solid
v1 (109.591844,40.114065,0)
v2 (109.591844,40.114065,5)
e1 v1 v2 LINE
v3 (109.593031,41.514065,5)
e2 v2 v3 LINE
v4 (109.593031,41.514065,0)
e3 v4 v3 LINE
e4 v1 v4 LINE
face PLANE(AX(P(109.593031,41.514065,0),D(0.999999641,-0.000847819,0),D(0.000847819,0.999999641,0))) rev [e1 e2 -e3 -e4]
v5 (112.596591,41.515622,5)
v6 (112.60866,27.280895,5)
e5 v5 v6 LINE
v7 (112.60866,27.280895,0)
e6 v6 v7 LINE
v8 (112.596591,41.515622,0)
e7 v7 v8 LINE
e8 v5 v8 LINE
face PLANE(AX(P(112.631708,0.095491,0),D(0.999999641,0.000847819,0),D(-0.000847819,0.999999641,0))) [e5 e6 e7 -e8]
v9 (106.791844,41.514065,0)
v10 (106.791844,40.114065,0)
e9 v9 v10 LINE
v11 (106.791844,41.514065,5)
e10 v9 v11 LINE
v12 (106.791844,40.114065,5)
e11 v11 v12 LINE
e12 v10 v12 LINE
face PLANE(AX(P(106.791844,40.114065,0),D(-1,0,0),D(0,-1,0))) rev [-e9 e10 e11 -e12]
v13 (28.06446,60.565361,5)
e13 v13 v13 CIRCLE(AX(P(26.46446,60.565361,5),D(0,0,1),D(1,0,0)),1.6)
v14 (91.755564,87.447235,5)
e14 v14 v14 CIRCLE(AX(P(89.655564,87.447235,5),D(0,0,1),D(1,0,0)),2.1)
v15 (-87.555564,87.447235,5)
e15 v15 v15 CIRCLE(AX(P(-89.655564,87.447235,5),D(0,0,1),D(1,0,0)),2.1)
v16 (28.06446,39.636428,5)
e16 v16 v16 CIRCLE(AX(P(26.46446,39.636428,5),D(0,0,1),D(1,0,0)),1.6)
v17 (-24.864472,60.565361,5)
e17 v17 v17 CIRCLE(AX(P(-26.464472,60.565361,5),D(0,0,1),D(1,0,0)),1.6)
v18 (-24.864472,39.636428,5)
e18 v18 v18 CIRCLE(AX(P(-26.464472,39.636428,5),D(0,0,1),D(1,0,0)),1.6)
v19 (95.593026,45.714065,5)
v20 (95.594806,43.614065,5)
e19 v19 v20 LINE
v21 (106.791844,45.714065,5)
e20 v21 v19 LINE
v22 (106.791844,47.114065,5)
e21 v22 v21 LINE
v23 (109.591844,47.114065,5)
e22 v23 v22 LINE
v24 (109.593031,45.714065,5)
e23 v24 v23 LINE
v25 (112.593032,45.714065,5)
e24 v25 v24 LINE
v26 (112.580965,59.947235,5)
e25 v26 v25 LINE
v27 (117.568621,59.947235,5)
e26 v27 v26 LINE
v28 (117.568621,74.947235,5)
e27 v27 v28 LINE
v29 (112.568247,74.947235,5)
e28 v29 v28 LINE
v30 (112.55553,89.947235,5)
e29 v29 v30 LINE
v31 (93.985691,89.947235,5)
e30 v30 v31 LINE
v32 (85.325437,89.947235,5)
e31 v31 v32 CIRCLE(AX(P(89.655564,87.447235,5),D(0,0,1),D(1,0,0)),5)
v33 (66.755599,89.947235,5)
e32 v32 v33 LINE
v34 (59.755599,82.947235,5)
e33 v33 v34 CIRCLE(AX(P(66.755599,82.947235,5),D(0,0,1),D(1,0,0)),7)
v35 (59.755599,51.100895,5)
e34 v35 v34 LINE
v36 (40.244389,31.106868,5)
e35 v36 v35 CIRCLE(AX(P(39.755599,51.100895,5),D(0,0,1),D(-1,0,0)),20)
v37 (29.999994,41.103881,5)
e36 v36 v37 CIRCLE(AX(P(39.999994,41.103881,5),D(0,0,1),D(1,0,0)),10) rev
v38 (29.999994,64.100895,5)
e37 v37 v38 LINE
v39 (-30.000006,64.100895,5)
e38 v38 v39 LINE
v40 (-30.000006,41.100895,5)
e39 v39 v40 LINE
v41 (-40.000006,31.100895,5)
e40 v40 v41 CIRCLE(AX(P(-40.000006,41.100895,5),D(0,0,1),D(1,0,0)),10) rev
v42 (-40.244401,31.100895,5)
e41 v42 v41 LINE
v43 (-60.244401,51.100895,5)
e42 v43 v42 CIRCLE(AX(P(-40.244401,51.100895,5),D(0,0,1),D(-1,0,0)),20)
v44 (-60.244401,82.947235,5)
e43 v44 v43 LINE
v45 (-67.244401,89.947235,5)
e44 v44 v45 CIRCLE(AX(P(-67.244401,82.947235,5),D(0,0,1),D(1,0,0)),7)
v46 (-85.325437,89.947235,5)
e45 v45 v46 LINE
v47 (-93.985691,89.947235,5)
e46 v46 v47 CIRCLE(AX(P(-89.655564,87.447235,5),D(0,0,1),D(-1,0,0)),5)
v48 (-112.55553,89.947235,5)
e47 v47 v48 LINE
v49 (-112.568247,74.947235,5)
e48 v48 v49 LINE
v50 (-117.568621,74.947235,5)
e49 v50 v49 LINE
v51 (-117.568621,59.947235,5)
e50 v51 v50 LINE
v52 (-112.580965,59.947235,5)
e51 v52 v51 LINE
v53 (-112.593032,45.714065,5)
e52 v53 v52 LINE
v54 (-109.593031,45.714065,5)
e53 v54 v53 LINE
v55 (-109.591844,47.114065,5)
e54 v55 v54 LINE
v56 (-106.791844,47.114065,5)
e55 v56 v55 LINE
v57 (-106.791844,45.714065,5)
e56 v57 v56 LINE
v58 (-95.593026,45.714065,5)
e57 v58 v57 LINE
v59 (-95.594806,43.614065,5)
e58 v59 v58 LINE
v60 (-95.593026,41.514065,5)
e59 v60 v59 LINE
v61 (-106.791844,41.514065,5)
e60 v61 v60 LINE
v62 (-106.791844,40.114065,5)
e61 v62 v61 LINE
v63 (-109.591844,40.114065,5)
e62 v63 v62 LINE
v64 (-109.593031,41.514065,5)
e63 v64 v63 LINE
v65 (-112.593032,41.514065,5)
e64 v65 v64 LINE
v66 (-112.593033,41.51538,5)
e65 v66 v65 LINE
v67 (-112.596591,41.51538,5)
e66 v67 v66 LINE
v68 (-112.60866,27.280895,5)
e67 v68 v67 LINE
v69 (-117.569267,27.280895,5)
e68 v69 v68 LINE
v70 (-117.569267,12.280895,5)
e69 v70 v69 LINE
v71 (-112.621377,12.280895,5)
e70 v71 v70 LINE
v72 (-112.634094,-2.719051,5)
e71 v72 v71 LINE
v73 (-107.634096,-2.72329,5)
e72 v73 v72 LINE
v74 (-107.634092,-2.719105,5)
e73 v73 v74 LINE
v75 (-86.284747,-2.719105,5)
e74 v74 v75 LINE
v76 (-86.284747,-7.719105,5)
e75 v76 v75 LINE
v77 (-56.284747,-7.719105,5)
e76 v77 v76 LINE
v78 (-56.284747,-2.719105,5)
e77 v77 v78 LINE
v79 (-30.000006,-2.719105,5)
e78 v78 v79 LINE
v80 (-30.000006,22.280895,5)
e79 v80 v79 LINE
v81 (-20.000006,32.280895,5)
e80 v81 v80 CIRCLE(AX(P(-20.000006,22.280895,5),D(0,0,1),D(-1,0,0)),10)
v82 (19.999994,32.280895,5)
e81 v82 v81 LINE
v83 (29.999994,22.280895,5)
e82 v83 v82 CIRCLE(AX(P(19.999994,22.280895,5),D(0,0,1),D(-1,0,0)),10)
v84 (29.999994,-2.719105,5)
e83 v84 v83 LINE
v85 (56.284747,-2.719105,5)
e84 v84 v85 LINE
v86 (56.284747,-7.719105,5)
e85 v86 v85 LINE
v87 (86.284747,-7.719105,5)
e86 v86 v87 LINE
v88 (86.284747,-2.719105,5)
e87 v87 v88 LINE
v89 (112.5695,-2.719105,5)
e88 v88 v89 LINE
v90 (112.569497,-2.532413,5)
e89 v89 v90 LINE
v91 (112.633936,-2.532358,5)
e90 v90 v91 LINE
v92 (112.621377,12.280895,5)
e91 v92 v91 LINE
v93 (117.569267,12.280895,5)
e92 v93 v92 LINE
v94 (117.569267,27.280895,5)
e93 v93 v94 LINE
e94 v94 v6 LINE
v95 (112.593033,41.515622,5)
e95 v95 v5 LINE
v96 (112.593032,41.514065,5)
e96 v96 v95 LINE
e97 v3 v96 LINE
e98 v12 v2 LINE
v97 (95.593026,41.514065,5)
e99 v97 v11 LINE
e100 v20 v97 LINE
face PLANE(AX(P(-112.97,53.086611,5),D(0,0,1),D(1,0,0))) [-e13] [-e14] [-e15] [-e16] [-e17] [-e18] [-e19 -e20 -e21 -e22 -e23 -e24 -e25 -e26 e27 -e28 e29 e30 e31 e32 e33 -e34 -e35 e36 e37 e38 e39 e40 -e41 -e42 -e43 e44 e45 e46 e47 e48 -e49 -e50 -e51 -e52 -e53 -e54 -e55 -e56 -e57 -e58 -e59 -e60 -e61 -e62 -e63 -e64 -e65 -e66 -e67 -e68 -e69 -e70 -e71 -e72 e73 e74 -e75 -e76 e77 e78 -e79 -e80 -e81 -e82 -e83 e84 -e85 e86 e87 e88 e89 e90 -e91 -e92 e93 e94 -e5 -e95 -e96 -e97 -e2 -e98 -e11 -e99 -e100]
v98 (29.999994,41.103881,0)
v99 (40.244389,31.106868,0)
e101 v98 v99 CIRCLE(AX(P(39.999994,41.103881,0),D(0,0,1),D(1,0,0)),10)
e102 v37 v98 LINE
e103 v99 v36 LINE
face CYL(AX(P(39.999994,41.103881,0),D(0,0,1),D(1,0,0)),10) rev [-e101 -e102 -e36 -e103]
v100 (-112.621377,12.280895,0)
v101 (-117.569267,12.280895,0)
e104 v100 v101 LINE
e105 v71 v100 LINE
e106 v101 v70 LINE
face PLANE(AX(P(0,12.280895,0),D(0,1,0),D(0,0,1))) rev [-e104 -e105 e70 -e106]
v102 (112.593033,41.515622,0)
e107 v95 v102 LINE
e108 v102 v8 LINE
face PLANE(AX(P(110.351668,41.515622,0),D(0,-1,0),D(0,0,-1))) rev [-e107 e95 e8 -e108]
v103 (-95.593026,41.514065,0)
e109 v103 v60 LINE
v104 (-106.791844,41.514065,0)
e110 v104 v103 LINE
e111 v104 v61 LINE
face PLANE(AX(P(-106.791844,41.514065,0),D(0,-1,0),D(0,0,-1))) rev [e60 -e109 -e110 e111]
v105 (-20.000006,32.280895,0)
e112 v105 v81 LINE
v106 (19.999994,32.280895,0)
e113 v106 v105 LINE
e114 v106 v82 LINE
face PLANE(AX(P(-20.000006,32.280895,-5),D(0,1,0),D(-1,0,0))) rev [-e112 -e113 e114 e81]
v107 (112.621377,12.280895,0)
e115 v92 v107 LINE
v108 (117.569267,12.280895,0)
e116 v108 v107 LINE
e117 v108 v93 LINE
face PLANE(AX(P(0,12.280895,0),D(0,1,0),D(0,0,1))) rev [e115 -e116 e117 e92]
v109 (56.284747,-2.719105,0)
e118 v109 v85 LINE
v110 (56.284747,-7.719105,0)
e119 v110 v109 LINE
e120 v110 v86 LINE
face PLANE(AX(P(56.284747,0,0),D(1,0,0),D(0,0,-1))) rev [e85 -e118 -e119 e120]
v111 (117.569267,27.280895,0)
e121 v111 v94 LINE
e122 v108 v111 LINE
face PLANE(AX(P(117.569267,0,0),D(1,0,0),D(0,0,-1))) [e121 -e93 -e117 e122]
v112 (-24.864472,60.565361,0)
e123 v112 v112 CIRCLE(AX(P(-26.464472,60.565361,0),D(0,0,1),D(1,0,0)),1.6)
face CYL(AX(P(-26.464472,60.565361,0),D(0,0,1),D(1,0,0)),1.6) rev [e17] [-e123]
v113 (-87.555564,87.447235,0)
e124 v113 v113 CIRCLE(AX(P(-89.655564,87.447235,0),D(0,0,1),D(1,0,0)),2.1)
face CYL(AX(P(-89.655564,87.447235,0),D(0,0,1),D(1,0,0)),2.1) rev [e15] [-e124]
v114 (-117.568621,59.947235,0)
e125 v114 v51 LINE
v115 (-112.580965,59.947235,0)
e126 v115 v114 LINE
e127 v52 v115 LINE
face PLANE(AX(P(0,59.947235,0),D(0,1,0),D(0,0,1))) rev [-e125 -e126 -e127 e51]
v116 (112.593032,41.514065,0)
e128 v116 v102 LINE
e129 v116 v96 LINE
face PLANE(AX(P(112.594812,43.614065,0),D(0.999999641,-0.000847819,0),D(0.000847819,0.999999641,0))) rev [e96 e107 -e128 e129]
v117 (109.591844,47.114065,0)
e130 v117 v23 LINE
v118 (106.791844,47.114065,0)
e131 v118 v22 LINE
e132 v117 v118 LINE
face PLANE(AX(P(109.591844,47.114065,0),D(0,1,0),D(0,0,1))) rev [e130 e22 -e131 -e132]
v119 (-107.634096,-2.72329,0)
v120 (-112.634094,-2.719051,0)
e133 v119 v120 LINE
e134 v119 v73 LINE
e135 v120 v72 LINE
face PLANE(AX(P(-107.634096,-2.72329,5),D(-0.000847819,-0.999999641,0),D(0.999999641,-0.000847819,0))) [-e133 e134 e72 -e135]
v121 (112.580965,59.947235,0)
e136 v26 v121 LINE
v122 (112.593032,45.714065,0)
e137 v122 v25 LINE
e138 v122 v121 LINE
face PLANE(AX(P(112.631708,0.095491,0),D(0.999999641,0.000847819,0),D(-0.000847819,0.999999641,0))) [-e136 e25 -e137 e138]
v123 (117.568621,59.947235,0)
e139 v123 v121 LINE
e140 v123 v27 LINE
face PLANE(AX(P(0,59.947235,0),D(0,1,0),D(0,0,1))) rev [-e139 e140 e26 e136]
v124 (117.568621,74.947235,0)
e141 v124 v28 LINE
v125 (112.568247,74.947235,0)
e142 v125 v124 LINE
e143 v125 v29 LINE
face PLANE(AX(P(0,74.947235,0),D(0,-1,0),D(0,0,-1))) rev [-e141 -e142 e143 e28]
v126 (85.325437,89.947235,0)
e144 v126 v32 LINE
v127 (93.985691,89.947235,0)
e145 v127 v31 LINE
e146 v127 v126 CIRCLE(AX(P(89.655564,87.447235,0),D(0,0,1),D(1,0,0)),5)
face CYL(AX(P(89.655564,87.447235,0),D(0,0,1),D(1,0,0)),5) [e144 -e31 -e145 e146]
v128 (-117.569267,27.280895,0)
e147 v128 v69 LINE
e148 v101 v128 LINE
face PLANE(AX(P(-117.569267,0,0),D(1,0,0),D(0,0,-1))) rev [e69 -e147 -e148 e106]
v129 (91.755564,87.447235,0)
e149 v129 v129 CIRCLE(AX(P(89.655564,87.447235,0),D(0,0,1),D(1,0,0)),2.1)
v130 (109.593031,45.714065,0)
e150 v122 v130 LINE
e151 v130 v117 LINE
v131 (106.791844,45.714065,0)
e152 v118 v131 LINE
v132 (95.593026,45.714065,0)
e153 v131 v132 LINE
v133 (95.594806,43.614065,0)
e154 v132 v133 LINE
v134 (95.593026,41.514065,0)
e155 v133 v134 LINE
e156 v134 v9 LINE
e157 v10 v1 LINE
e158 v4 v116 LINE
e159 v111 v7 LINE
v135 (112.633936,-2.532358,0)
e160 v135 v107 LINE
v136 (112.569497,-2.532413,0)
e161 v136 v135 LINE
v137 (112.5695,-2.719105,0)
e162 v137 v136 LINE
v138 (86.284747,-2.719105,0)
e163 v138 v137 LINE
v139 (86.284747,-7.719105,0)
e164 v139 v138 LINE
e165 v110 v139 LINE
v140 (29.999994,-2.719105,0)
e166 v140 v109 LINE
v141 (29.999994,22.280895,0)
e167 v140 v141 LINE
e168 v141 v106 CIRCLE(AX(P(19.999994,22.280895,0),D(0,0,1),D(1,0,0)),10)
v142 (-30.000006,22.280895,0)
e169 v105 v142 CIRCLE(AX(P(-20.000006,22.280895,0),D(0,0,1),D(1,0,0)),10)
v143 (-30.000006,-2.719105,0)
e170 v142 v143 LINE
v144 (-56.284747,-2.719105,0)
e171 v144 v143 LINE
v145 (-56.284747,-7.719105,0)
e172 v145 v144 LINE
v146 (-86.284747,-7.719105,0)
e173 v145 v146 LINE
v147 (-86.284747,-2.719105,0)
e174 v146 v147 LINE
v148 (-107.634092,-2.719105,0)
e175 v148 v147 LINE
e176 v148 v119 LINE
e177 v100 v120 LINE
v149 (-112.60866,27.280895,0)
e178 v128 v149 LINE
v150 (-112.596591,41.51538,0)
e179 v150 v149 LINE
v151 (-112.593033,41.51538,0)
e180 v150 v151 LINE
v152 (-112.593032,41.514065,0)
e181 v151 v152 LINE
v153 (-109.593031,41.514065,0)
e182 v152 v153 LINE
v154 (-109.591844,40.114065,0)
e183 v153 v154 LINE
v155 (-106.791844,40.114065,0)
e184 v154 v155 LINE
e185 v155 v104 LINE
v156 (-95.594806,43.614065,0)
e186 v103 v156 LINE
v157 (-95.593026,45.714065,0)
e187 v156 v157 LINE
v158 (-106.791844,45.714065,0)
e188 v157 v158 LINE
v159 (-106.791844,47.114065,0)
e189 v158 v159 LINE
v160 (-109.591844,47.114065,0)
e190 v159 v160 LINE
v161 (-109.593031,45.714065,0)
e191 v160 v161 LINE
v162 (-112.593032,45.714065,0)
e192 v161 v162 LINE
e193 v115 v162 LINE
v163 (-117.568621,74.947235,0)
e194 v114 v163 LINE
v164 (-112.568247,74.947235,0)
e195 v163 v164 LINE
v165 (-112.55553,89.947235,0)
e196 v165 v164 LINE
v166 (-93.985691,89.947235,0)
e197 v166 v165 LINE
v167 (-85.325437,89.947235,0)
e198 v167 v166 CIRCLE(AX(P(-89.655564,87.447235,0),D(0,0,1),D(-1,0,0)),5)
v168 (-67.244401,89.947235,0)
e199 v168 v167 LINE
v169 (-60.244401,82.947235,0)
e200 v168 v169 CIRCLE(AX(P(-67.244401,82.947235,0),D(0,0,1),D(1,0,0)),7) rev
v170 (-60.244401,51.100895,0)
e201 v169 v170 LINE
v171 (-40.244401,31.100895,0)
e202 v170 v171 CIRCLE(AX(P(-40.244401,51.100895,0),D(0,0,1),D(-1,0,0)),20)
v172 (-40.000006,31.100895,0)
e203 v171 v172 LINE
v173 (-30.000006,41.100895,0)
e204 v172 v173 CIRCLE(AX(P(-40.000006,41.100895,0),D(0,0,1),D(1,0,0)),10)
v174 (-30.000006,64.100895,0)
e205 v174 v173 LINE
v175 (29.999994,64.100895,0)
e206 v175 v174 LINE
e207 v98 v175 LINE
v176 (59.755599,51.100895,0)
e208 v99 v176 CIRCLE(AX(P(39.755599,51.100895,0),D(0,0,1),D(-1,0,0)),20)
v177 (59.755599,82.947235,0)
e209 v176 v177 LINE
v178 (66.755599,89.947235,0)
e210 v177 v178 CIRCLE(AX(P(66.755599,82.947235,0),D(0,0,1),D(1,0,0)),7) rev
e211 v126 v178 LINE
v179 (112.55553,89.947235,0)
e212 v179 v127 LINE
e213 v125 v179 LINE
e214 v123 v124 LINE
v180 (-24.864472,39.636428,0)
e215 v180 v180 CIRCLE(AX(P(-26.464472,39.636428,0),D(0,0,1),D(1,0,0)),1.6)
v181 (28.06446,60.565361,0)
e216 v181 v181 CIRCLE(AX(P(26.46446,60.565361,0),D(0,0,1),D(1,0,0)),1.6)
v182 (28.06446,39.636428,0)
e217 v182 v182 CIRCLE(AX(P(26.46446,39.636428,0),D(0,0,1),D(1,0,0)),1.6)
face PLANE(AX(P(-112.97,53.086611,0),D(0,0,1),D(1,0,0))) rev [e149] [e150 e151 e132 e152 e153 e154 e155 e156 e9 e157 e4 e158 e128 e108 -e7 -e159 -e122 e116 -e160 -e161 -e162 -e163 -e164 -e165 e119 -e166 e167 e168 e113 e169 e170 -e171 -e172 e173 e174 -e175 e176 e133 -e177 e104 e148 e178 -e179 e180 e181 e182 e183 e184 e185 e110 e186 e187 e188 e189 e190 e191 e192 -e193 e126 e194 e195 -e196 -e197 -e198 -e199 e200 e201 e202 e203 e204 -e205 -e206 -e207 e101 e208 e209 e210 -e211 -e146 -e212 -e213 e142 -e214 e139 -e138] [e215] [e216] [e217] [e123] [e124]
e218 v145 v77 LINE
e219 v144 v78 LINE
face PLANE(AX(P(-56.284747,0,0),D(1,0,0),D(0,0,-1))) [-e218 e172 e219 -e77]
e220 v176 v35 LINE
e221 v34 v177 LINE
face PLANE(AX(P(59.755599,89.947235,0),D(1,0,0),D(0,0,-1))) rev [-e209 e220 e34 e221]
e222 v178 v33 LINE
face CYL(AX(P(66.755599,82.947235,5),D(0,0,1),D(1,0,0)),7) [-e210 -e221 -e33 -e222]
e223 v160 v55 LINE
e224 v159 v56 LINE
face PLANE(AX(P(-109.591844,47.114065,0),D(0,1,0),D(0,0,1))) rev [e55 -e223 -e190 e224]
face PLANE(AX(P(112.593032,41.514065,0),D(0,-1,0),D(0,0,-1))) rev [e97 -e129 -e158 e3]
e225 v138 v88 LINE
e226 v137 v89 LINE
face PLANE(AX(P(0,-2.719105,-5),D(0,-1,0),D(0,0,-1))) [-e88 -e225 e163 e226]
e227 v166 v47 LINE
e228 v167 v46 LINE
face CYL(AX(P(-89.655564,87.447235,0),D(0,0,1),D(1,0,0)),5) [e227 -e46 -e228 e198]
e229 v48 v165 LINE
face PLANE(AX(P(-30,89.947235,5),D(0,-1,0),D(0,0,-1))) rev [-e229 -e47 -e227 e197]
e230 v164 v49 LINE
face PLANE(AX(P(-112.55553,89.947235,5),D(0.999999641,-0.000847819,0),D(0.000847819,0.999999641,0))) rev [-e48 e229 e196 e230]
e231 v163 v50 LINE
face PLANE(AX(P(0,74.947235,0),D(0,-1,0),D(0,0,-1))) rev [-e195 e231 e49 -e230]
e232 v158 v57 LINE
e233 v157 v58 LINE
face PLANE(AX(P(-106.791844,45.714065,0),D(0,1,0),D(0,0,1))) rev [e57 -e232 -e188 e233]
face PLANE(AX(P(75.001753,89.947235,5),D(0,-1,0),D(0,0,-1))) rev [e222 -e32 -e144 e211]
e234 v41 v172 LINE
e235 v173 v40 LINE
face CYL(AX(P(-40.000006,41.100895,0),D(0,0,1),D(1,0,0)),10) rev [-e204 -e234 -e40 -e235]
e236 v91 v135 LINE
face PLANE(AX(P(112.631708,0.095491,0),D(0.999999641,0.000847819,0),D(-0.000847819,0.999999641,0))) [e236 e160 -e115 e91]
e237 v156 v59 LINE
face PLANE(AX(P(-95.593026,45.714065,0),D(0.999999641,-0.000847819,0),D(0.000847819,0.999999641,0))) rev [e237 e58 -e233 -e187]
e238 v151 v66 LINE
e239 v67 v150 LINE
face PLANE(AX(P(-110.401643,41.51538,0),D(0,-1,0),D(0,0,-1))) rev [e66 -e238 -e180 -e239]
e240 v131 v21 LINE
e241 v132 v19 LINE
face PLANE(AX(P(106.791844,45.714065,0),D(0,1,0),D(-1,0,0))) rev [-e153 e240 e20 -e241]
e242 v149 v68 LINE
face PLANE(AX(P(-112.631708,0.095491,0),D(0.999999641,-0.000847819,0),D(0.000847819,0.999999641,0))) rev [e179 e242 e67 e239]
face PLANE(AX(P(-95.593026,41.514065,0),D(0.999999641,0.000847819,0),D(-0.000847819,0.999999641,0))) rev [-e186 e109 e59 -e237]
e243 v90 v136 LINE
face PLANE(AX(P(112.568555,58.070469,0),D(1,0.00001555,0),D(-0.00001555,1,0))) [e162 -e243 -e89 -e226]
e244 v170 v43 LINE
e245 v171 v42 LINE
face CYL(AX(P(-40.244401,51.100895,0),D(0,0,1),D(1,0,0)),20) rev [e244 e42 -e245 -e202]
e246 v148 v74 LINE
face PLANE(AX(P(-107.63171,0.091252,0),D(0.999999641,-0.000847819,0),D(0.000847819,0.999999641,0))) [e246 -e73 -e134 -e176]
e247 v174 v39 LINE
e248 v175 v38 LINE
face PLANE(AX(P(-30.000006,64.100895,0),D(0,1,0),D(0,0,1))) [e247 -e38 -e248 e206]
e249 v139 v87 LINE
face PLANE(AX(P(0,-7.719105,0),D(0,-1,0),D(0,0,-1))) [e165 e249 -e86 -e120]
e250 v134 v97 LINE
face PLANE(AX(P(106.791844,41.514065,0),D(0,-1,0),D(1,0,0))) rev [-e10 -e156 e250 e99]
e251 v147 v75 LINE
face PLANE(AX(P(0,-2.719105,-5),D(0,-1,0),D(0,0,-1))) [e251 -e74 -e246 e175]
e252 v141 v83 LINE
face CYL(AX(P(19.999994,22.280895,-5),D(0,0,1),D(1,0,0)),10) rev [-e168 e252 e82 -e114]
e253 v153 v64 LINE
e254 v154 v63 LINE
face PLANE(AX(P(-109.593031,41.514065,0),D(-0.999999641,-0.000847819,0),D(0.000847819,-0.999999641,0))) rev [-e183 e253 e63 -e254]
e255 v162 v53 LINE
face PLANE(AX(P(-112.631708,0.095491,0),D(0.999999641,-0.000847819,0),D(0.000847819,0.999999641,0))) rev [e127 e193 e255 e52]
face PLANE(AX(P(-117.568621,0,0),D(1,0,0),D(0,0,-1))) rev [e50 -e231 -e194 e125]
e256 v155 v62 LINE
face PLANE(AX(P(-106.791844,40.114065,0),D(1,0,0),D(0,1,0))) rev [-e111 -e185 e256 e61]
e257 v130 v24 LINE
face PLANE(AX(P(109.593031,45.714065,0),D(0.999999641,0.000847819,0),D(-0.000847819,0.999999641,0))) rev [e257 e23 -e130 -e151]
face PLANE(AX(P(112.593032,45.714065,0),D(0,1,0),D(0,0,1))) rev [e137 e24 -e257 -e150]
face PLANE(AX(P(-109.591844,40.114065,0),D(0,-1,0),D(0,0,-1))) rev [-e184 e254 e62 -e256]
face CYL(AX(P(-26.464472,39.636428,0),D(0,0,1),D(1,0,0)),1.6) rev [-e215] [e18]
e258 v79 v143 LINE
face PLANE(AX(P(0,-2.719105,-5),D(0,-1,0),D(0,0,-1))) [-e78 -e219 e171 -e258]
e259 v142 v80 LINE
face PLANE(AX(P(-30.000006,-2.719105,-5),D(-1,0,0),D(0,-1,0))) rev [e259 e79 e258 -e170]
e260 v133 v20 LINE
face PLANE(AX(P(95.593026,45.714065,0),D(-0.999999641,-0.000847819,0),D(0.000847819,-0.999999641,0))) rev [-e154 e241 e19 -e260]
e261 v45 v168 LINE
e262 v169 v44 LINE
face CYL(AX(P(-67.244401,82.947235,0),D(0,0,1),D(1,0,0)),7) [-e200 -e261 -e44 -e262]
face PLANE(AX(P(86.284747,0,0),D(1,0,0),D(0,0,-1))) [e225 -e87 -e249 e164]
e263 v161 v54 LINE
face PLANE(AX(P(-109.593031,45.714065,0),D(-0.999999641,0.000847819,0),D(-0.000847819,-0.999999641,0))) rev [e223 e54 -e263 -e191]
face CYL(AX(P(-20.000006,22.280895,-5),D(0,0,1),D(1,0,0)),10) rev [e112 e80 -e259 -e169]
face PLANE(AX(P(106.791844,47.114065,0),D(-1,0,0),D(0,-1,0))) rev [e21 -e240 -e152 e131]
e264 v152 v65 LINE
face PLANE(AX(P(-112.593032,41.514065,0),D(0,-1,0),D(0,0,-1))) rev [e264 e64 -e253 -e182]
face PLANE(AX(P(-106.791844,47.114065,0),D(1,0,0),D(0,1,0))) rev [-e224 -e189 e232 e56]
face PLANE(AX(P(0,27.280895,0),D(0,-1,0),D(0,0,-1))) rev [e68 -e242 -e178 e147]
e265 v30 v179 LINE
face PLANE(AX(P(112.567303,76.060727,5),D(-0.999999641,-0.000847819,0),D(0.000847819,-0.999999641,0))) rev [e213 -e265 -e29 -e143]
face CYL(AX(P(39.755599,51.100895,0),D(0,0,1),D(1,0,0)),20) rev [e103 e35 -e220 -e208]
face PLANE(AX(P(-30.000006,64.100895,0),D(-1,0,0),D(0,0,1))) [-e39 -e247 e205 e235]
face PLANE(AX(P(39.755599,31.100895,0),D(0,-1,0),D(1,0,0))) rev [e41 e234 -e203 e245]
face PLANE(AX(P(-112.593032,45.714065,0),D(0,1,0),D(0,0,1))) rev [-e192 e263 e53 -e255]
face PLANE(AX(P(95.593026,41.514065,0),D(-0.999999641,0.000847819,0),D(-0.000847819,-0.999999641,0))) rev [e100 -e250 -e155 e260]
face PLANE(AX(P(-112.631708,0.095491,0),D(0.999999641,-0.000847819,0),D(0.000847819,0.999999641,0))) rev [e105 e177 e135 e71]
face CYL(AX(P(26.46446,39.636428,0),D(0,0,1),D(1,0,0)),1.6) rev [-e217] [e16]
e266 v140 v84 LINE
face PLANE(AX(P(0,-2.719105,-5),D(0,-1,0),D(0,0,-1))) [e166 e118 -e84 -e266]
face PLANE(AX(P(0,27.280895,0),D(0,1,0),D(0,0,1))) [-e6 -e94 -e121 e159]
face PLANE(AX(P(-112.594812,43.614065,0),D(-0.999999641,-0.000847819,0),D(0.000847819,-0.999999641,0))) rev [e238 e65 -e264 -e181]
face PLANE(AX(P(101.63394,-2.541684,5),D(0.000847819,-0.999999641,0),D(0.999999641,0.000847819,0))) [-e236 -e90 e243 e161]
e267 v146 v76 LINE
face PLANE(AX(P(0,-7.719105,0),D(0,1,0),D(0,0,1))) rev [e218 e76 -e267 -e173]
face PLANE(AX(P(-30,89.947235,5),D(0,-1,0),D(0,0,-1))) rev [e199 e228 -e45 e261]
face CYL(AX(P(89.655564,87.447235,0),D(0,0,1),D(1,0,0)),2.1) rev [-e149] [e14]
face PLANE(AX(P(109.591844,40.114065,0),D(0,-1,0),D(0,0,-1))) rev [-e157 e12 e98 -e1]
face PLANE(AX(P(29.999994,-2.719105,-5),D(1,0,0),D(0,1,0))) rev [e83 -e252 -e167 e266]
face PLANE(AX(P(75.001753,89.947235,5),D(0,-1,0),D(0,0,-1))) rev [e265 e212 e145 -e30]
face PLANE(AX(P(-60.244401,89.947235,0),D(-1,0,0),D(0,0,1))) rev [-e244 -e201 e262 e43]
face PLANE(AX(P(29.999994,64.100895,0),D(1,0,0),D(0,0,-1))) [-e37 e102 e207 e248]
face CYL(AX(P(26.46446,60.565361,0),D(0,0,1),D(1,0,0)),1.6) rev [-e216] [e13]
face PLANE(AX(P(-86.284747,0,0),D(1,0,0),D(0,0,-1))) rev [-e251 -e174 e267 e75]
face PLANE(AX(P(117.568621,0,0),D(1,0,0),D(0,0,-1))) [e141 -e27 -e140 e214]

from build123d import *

# Parameters (mm, degrees)
BOSS_EXTRUDE1_DEPTH     = 5
BOSS_EXTRUDE2_START     = -5
BOSS_EXTRUDE2_DEPTH     = 5
CUT_EXTRUDE1_DEPTH      = 5
FILLET1_R               = 7
SKETCH5_W               = 60
SKETCH5_H               = 33
BOSS_EXTRUDE3_DEPTH     = 5
SKETCH6_R               = 1.6
CUT_EXTRUDE2_DEPTH      = 5
CUT_EXTRUDE3_START      = -5
CUT_EXTRUDE3_DEPTH      = 5
CUT_EXTRUDE4_DEPTH      = 10
FILLET2_R               = 10
BOSS_EXTRUDE5_START     = -5
BOSS_EXTRUDE5_OUTLINE_W = 30
BOSS_EXTRUDE5_OUTLINE_H = 5
BOSS_EXTRUDE5_DEPTH     = 5
SKETCH12_W              = 5
SKETCH12_H              = 92.666318873
BOSS_EXTRUDE6_DEPTH     = 5
SKETCH13_W              = 5
SKETCH13_H              = 92.479626066
BOSS_EXTRUDE7_DEPTH     = 11
SKETCH14_W              = 14.125243299
SKETCH14_H              = 18.417399827
SKETCH14_W_2            = 17.448829958
BOSS_EXTRUDE8_DEPTH     = 5
CUT_EXTRUDE5_DEPTH      = 5
SKETCH17_W              = 6.263528668
SKETCH17_H              = 4.2
SKETCH17_W_2            = 6.634448871
CUT_EXTRUDE6_DEPTH      = 5
BOSS_EXTRUDE9_DEPTH     = 5
CUT_EXTRUDE7_DEPTH      = 5
SKETCH21_W              = 3.746111535
SKETCH21_H              = 4.198684894
SKETCH21_W_2            = 4.081394213
SKETCH21_H_2            = 4.198442995
CUT_EXTRUDE8_DEPTH      = 5
BOSS_EXTRUDE10_DEPTH    = 5
SKETCH23_R              = 2.1
CUT_EXTRUDE9_DEPTH      = 5


# Read off the part's stored shape, not the designer's step: Cut-Extrude3, Boss-Extrude5
with BuildPart() as part:
    # Sketch1 → Boss-Extrude1 (new body)
    with BuildSketch(Plane.XY):
        with BuildLine():
            Line((-112.555529977, 89.947234922), (-112.567255319, 76.117234919))
            Line((-112.567255319, 76.117234919), (-109.550918722, 76.117234919))
            Line((-109.550918722, 76.117234919), (-109.550918722, 77.517234919))
            Line((-109.550918722, 77.517234919), (-106.750918722, 77.517234919))
            Line((-106.750918722, 77.517234919), (-106.750918722, 76.117234919))
            Line((-106.750918722, 76.117234919), (-95.550918722, 76.117234919))
            Line((-95.550918722, 76.117234919), (-95.550918722, 71.917234919))
            Line((-95.550918722, 71.917234919), (-106.750918722, 71.917234919))
            Line((-106.750918722, 71.917234919), (-106.750918722, 70.517234919))
            Line((-106.750918722, 70.517234919), (-109.550918722, 70.517234919))
            Line((-109.550918722, 70.517234919), (-109.550918722, 71.917234919))
            Line((-109.550918722, 71.917234919), (-112.5683672, 71.917234919))
            Line((-112.5683672, 71.917234919), (-112.56855454, 63.078549452))
            Line((-112.56855454, 63.078549452), (-112.56855454, 58.070468723))
            ThreePointArc((-112.56855454, 58.070468723), (-109.295273663, 56.47724277), (-107.97, 53.086610624))
            Line((-107.97, 53.086610624), (-107.97, -29.899029756))
            ThreePointArc((-107.97, -29.899029756), (-109.295765386, -33.290194747), (-112.57, -34.883004073))
            Line((-112.57, -34.883004073), (-112.57, -63.301209568))
            Line((-112.57, -63.301209568), (-109.57, -63.301209568))
            Line((-109.57, -63.301209568), (-109.57, -61.901209568))
            Line((-109.57, -61.901209568), (-106.77, -61.901209568))
            Line((-106.77, -61.901209568), (-106.77, -63.301209568))
            Line((-106.77, -63.301209568), (-95.57, -63.301209568))
            Line((-95.57, -63.301209568), (-95.57, -67.501209568))
            Line((-95.57, -67.501209568), (-106.77, -67.501209568))
            Line((-106.77, -67.501209568), (-106.77, -68.901209568))
            Line((-106.77, -68.901209568), (-109.57, -68.901209568))
            Line((-109.57, -68.901209568), (-109.57, -67.501209568))
            Line((-109.57, -67.501209568), (-112.57, -67.501209568))
            Line((-112.57, -67.501209568), (-112.57, -90.906209566))
            Line((-112.57, -90.906209566), (-94.225, -90.906209566))
            Line((-94.225, -90.906209566), (-94.225, -87.906209568))
            Line((-94.225, -87.906209568), (-95.625, -87.906209568))
            Line((-95.625, -87.906209568), (-95.625, -85.106209568))
            Line((-95.625, -85.106209568), (-94.225, -85.106209568))
            Line((-94.225, -85.106209568), (-94.225, -73.906209568))
            Line((-94.225, -73.906209568), (-90.025, -73.906209568))
            Line((-90.025, -73.906209568), (-90.025, -85.106209568))
            Line((-90.025, -85.106209568), (-88.625, -85.106209568))
            Line((-88.625, -85.106209568), (-88.625, -87.906209568))
            Line((-88.625, -87.906209568), (-90.025, -87.906209568))
            Line((-90.025, -87.906209568), (-90.025, -90.906209566))
            Line((-90.025, -90.906209566), (-74.478184725, -90.906209566))
            Line((-74.478184725, -90.906209566), (-58.579544248, -63.368956488))
            Line((-58.579544248, -63.368956488), (-61.177620458, -61.868956489))
            Line((-61.177620458, -61.868956489), (-61.877620458, -63.081392054))
            Line((-61.877620458, -63.081392054), (-64.302491589, -61.681392054))
            Line((-64.302491589, -61.681392054), (-63.602491589, -60.468956489))
            Line((-63.602491589, -60.468956489), (-73.301976111, -54.868956489))
            Line((-73.301976111, -54.868956489), (-71.201976111, -51.231649793))
            Line((-71.201976111, -51.231649793), (-61.502491589, -56.831649793))
            Line((-61.502491589, -56.831649793), (-60.802491589, -55.619214227))
            Line((-60.802491589, -55.619214227), (-58.377620458, -57.019214227))
            Line((-58.377620458, -57.019214227), (-59.077620458, -58.231649793))
            Line((-59.077620458, -58.231649793), (-56.479544248, -59.731649792))
            Line((-56.479544248, -59.731649792), (-39.837168574, -30.906209566))
            Line((-39.837168574, -30.906209566), (-2.099582772, -30.906209566))
            Line((-2.099582772, -30.906209566), (-2.099582772, -27.906209566))
            Line((-2.099582772, -27.906209566), (-3.499582772, -27.906209566))
            Line((-3.499582772, -27.906209566), (-3.499582772, -25.106209566))
            Line((-3.499582772, -25.106209566), (-2.099582772, -25.106209566))
            Line((-2.099582772, -25.106209566), (-2.099582772, -13.906209566))
            Line((-2.099582772, -13.906209566), (2.100417228, -13.906209566))
            Line((2.100417228, -13.906209566), (2.100417228, -25.106209566))
            Line((2.100417228, -25.106209566), (3.500417228, -25.106209566))
            Line((3.500417228, -25.106209566), (3.500417228, -27.906209566))
            Line((3.500417228, -27.906209566), (2.100417228, -27.906209566))
            Line((2.100417228, -27.906209566), (2.100417228, -30.906209566))
            Line((2.100417228, -30.906209566), (39.837168574, -30.906209566))
            Line((39.837168574, -30.906209566), (56.479752862, -59.732011122))
            Line((56.479752862, -59.732011122), (59.078454915, -58.231649793))
            Line((59.078454915, -58.231649793), (58.378454915, -57.019214227))
            Line((58.378454915, -57.019214227), (60.803326045, -55.619214227))
            Line((60.803326045, -55.619214227), (61.503326045, -56.831649793))
            Line((61.503326045, -56.831649793), (71.202810568, -51.231649793))
            Line((71.202810568, -51.231649793), (73.302810568, -54.868956489))
            Line((73.302810568, -54.868956489), (63.603326045, -60.468956489))
            Line((63.603326045, -60.468956489), (64.303326045, -61.681392054))
            Line((64.303326045, -61.681392054), (61.878454915, -63.081392054))
            Line((61.878454915, -63.081392054), (61.178454915, -61.868956489))
            Line((61.178454915, -61.868956489), (58.580378703, -63.368956489))
            Line((58.580378703, -63.368956489), (74.478184725, -90.906209566))
            Line((74.478184725, -90.906209566), (90.025834456, -90.906209566))
            Line((90.025834456, -90.906209566), (90.025834456, -87.906209568))
            Line((90.025834456, -87.906209568), (88.625834456, -87.906209568))
            Line((88.625834456, -87.906209568), (88.625834456, -85.106209568))
            Line((88.625834456, -85.106209568), (90.025834456, -85.106209568))
            Line((90.025834456, -85.106209568), (90.025834456, -73.906209568))
            Line((90.025834456, -73.906209568), (94.225834456, -73.906209568))
            Line((94.225834456, -73.906209568), (94.225834456, -85.106209568))
            Line((94.225834456, -85.106209568), (95.625834456, -85.106209568))
            Line((95.625834456, -85.106209568), (95.625834456, -87.906209568))
            Line((95.625834456, -87.906209568), (94.225834456, -87.906209568))
            Line((94.225834456, -87.906209568), (94.225834456, -90.906209566))
            Line((94.225834456, -90.906209566), (112.57, -90.906209566))
            Line((112.57, -90.906209566), (112.57, -67.501209568))
            Line((112.57, -67.501209568), (109.570834456, -67.501209568))
            Line((109.570834456, -67.501209568), (109.570834456, -68.901209568))
            Line((109.570834456, -68.901209568), (106.770834456, -68.901209568))
            Line((106.770834456, -68.901209568), (106.770834456, -67.501209568))
            Line((106.770834456, -67.501209568), (95.570834456, -67.501209568))
            Line((95.570834456, -67.501209568), (95.570834456, -63.301209568))
            Line((95.570834456, -63.301209568), (106.770834456, -63.301209568))
            Line((106.770834456, -63.301209568), (106.770834456, -61.901209568))
            Line((106.770834456, -61.901209568), (109.570834456, -61.901209568))
            Line((109.570834456, -61.901209568), (109.570834456, -63.301209568))
            Line((109.570834456, -63.301209568), (112.57, -63.301209568))
            Line((112.57, -63.301209568), (112.57, -34.883004073))
            ThreePointArc((112.57, -34.883004073), (109.295765386, -33.290194747), (107.97, -29.899029756))
            Line((107.97, -29.899029756), (107.97, 53.086610624))
            ThreePointArc((107.97, 53.086610624), (109.295273663, 56.47724277), (112.56855454, 58.070468723))
            Line((112.56855454, 58.070468723), (112.56855454, 63.078549452))
            Line((112.56855454, 63.078549452), (112.5683672, 71.917234919))
            Line((112.5683672, 71.917234919), (109.551753179, 71.917234919))
            Line((109.551753179, 71.917234919), (109.551753179, 70.517234919))
            Line((109.551753179, 70.517234919), (106.751753179, 70.517234919))
            Line((106.751753179, 70.517234919), (106.751753179, 71.917234919))
            Line((106.751753179, 71.917234919), (95.551753179, 71.917234919))
            Line((95.551753179, 71.917234919), (95.551753179, 76.117234919))
            Line((95.551753179, 76.117234919), (106.751753179, 76.117234919))
            Line((106.751753179, 76.117234919), (106.751753179, 77.517234919))
            Line((106.751753179, 77.517234919), (109.551753179, 77.517234919))
            Line((109.551753179, 77.517234919), (109.551753179, 76.117234919))
            Line((109.551753179, 76.117234919), (112.550918722, 76.117234919))
            Line((112.550918722, 76.117234919), (112.567303227, 76.060727176))
            Line((112.567303227, 76.060727176), (112.555529977, 89.947234922))
            Line((112.555529977, 89.947234922), (79.201753179, 89.947234922))
            Line((79.201753179, 89.947234922), (79.201753179, 86.947234919))
            Line((79.201753179, 86.947234919), (80.601753179, 86.947234919))
            Line((80.601753179, 86.947234919), (80.601753179, 84.147234919))
            Line((80.601753179, 84.147234919), (79.201753179, 84.147234919))
            Line((79.201753179, 84.147234919), (79.201753179, 72.947234919))
            Line((79.201753179, 72.947234919), (75.001753179, 72.947234919))
            Line((75.001753179, 72.947234919), (75.001753179, 84.147234919))
            Line((75.001753179, 84.147234919), (73.601753179, 84.147234919))
            Line((73.601753179, 84.147234919), (73.601753179, 86.947234919))
            Line((73.601753179, 86.947234919), (75.001753179, 86.947234919))
            Line((75.001753179, 86.947234919), (75.001753179, 89.947234922))
            Line((75.001753179, 89.947234922), (30, 89.947234922))
            Line((30, 89.947234922), (30, 57.382012806))
            Line((30, 57.382012806), (-30, 57.382012806))
            Line((-30, 57.382012806), (-30, 89.947234922))
            Line((-30, 89.947234922), (-75.000918722, 89.947234922))
            Line((-75.000918722, 89.947234922), (-75.000918722, 86.947234919))
            Line((-75.000918722, 86.947234919), (-73.600918722, 86.947234919))
            Line((-73.600918722, 86.947234919), (-73.600918722, 84.147234919))
            Line((-73.600918722, 84.147234919), (-75.000918722, 84.147234919))
            Line((-75.000918722, 84.147234919), (-75.000918722, 72.947234919))
            Line((-75.000918722, 72.947234919), (-79.200918722, 72.947234919))
            Line((-79.200918722, 72.947234919), (-79.200918722, 84.147234919))
            Line((-79.200918722, 84.147234919), (-80.600918722, 84.147234919))
            Line((-80.600918722, 84.147234919), (-80.600918722, 86.947234919))
            Line((-80.600918722, 86.947234919), (-79.200918722, 86.947234919))
            Line((-79.200918722, 86.947234919), (-79.200918722, 89.947234922))
            Line((-79.200918722, 89.947234922), (-112.555529977, 89.947234922))
        make_face()
    extrude(amount=BOSS_EXTRUDE1_DEPTH)

    # Sketch2 → Boss-Extrude2 (add)
    with BuildSketch(Plane.XY.offset(5).offset(BOSS_EXTRUDE2_START)):
        with BuildLine():
            Line((112.56855454, 58.070468723), (112.57, -34.883004073))
            ThreePointArc((112.57, -34.883004073), (109.295765386, -33.290194747), (107.97, -29.899029756))
            Line((107.97, -29.899029756), (107.97, 53.086610624))
            ThreePointArc((107.97, 53.086610624), (109.295273663, 56.47724277), (112.56855454, 58.070468723))
        make_face()
        with BuildLine():
            Line((-112.57, -34.883004073), (-112.56855454, 58.070468723))
            ThreePointArc((-112.56855454, 58.070468723), (-109.295273663, 56.47724277), (-107.97, 53.086610624))
            Line((-107.97, 53.086610624), (-107.97, -29.899029756))
            ThreePointArc((-107.97, -29.899029756), (-109.295765386, -33.290194747), (-112.57, -34.883004073))
        make_face()
    extrude(amount=BOSS_EXTRUDE2_DEPTH)

    # Sketch3 → Cut-Extrude1 (cut)
    with BuildSketch(Plane.XY.offset(5)):
        with BuildLine():
            Line((59.755598965, 89.947234922), (-60.244401035, 89.947234922))
            Line((-60.244401035, 89.947234922), (-60.244401035, 51.100894588))
            ThreePointArc((-60.244401035, 51.100894588), (-54.386536659, 36.958758964), (-40.244401035, 31.100894588))
            Line((-40.244401035, 31.100894588), (39.755598965, 31.100894588))
            ThreePointArc((39.755598965, 31.100894588), (53.897734588, 36.958758964), (59.755598965, 51.100894588))
            Line((59.755598965, 51.100894588), (59.755598965, 89.947234922))
        make_face()
    extrude(amount=-CUT_EXTRUDE1_DEPTH, mode=Mode.SUBTRACT)

    # Fillet1
    fillet1_edges = [part.edges().sort_by_distance(p)[0] for p in [
        (-60.244401035, 89.947234922, 2.5),
        (59.755598965, 89.947234922, 2.5),
    ]]
    fillet(fillet1_edges, radius=FILLET1_R)

    # Sketch5 → Boss-Extrude3 (add)
    with BuildSketch(Plane.XY.offset(5)):
        with Locations((-6.023e-06, 47.600894588)):
            Rectangle(SKETCH5_W, SKETCH5_H)
    extrude(amount=-BOSS_EXTRUDE3_DEPTH)

    # Sketch6 → Cut-Extrude2 (cut)
    with BuildSketch(Plane.XY.offset(5)):
        with Locations((-26.464472117, 60.565360682)):
            Circle(SKETCH6_R)
        with Locations((-26.464472117, 39.636428494)):
            Circle(SKETCH6_R)
        with Locations((26.464460071, 60.565360682)):
            Circle(SKETCH6_R)
        with Locations((26.464460071, 39.636428494)):
            Circle(SKETCH6_R)
    extrude(amount=-CUT_EXTRUDE2_DEPTH, mode=Mode.SUBTRACT)

    # Cut-Extrude3 outline → Cut-Extrude3 (cut)
    with BuildSketch(Plane.XY.offset(5).offset(CUT_EXTRUDE3_START)):
        Polygon((112.56949984, -2.719105412), (-112.56949984, -2.719105412), (-112.57, -34.883004073), (-112.57, -63.301209568), (-109.57, -63.301209568), (-109.57, -61.901209568), (-106.77, -61.901209568), (-106.77, -63.301209568), (-95.57, -63.301209568), (-95.57, -67.501209568), (-106.77, -67.501209568), (-106.77, -68.901209568), (-109.57, -68.901209568), (-109.57, -67.501209568), (-112.57, -67.501209568), (-112.57, -90.906209566), (-94.225, -90.906209566), (-94.225, -87.906209568), (-95.625, -87.906209568), (-95.625, -85.106209568), (-94.225, -85.106209568), (-94.225, -73.906209568), (-90.025, -73.906209568), (-90.025, -85.106209568), (-88.625, -85.106209568), (-88.625, -87.906209568), (-90.025, -87.906209568), (-90.025, -90.906209566), (-74.478184725, -90.906209566), (-58.579544248, -63.368956488), (-61.177620458, -61.868956489), (-61.877620458, -63.081392054), (-64.302491589, -61.681392054), (-63.602491589, -60.468956489), (-73.301976111, -54.868956489), (-71.201976111, -51.231649793), (-61.502491589, -56.831649793), (-60.802491589, -55.619214227), (-58.377620458, -57.019214227), (-59.077620458, -58.231649793), (-56.479544248, -59.731649792), (-39.837168574, -30.906209566), (-2.099582772, -30.906209566), (-2.099582772, -27.906209566), (-3.499582772, -27.906209566), (-3.499582772, -25.106209566), (-2.099582772, -25.106209566), (-2.099582772, -13.906209566), (2.100417228, -13.906209566), (2.100417228, -25.106209566), (3.500417228, -25.106209566), (3.500417228, -27.906209566), (2.100417228, -27.906209566), (2.100417228, -30.906209566), (39.837168574, -30.906209566), (56.479752862, -59.732011122), (59.078454915, -58.231649793), (58.378454915, -57.019214227), (60.803326045, -55.619214227), (61.503326045, -56.831649793), (71.202810568, -51.231649793), (73.302810568, -54.868956489), (63.603326045, -60.468956489), (64.303326045, -61.681392054), (61.878454915, -63.081392054), (61.178454915, -61.868956489), (58.580378703, -63.368956489), (58.579752591, -63.369317348), (74.478184725, -90.906209566), (90.025834456, -90.906209566), (90.025834456, -87.906209568), (88.625834456, -87.906209568), (88.625834456, -85.106209568), (90.025834456, -85.106209568), (90.025834456, -73.906209568), (94.225834456, -73.906209568), (94.225834456, -85.106209568), (95.625834456, -85.106209568), (95.625834456, -87.906209568), (94.225834456, -87.906209568), (94.225834456, -90.906209566), (112.57, -90.906209566), (112.57, -67.501209568), (109.570834456, -67.501209568), (109.570834456, -68.901209568), (106.770834456, -68.901209568), (106.770834456, -67.501209568), (95.570834456, -67.501209568), (95.570834456, -63.301209568), (106.770834456, -63.301209568), (106.770834456, -61.901209568), (109.570834456, -61.901209568), (109.570834456, -63.301209568), (112.57, -63.301209568), (112.57, -34.883004073), align=None)
    extrude(amount=CUT_EXTRUDE3_DEPTH, mode=Mode.SUBTRACT)

    # Sketch10 → Cut-Extrude4 (cut)
    with BuildSketch(Plane.XY.offset(5)):
        with BuildLine():
            Line((-30.000006023, -2.719105412), (29.999993977, -2.719105412))
            Line((29.999993977, -2.719105412), (29.999993977, 22.280894588))
            ThreePointArc((29.999993977, 22.280894588), (27.071061789, 29.3519624), (19.999993977, 32.280894588))
            Line((19.999993977, 32.280894588), (-20.000006023, 32.280894588))
            ThreePointArc((-20.000006023, 32.280894588), (-27.071073835, 29.3519624), (-30.000006023, 22.280894588))
            Line((-30.000006023, 22.280894588), (-30.000006023, -2.719105412))
        make_face()
    extrude(amount=-CUT_EXTRUDE4_DEPTH, mode=Mode.SUBTRACT)

    # Fillet2
    fillet2_edges = [part.edges().sort_by_distance(p)[0] for p in [
        (29.999993977, 31.100894588, 2.5),
        (-30.000006023, 31.100894588, 2.5),
    ]]
    fillet(fillet2_edges, radius=FILLET2_R)

    # Boss-Extrude5 outline → Boss-Extrude5 (add)
    with BuildSketch(Plane.XY.offset(5).offset(BOSS_EXTRUDE5_START)):
        with Locations((71.284746908, -5.219105412)):
            Rectangle(BOSS_EXTRUDE5_OUTLINE_W, BOSS_EXTRUDE5_OUTLINE_H)
        Polygon((117.569266584, 27.280894588), (112.569033329, 27.280894588), (112.569266585, 12.280894588), (117.569266584, 12.280894588), align=None)
        Polygon((112.56855454, 59.947234922), (117.56862091, 59.947234922), (117.56862091, 74.947234922), (112.564823831, 74.947234922), (112.564823831, 76.069278248), (112.550918722, 76.117234919), (109.551753179, 76.117234919), (109.551753179, 77.517234919), (106.751753179, 77.517234919), (106.751753179, 76.117234919), (95.551753179, 76.117234919), (95.551753179, 71.917234919), (106.751753179, 71.917234919), (106.751753179, 70.517234919), (109.551753179, 70.517234919), (109.551753179, 71.917234919), (112.5683672, 71.917234919), (112.56855454, 63.078549452), align=None)
        with Locations((-71.284746908, -5.219105412)):
            Rectangle(BOSS_EXTRUDE5_OUTLINE_W, BOSS_EXTRUDE5_OUTLINE_H)
        Polygon((-112.569266585, 12.280894588), (-112.569033329, 27.280894588), (-117.569266584, 27.280894588), (-117.569266584, 12.280894588), align=None)
        Polygon((-117.56862091, 59.947234922), (-112.56855454, 59.947234922), (-112.56855454, 63.078549452), (-112.5683672, 71.917234919), (-109.550918722, 71.917234919), (-109.550918722, 70.517234919), (-106.750918722, 70.517234919), (-106.750918722, 71.917234919), (-95.550918722, 71.917234919), (-95.550918722, 76.117234919), (-106.750918722, 76.117234919), (-106.750918722, 77.517234919), (-109.550918722, 77.517234919), (-109.550918722, 76.117234919), (-112.550918722, 76.117234919), (-112.563061404, 76.0753566), (-112.563061404, 74.947234922), (-117.56862091, 74.947234922), align=None)
    extrude(amount=BOSS_EXTRUDE5_DEPTH)

    # Sketch12 → Boss-Extrude6 (add)
    with BuildSketch(Plane(origin=(-112.631708027, 0.095491345, 0), x_dir=(0, 0, 1), z_dir=(-0.999999640601339, 0.0008478190804530466, 0))):
        with Locations((2.5, 43.518616433)):
            Rectangle(SKETCH12_W, SKETCH12_H)
    extrude(amount=-BOSS_EXTRUDE6_DEPTH)

    # Sketch13 → Boss-Extrude7 (add)
    with BuildSketch(Plane(origin=(112.631708027, 0.095491345, 0), x_dir=(0, 0, -1), z_dir=(0.999999640601339, 0.0008478190804733425, 0))):
        with Locations((-2.5, 43.611962836)):
            Rectangle(SKETCH13_W, SKETCH13_H)
    extrude(amount=-BOSS_EXTRUDE7_DEPTH)

    # Sketch14 → Boss-Extrude8 (add)
    with BuildSketch(Plane.XY.offset(5)):
        with Locations((-76.769807505, 80.738535009)):
            Rectangle(SKETCH14_W, SKETCH14_H)
        with Locations((77.36152379, 80.738535009)):
            Rectangle(SKETCH14_W_2, SKETCH14_H)
    extrude(amount=-BOSS_EXTRUDE8_DEPTH)

    # Sketch16 → Cut-Extrude5 (cut)
    with BuildSketch(Plane.XY.offset(5)):
        Polygon((-112.594812137, 43.614064755), (-112.593031716, 45.714064755), (-107.593029919, 45.714064755), (-107.590571243, 48.614064755), (-97.590571243, 48.614064755), (-97.590571243, 38.614064755), (-107.590571243, 38.614064755), (-107.593029919, 41.514064755), (-112.593031716, 41.514064755), align=None)
        Polygon((112.594812137, 43.614064755), (112.593031716, 41.514064755), (107.593029919, 41.514064755), (107.590571243, 38.614064755), (97.590571243, 38.614064755), (97.590571243, 48.614064755), (107.590571243, 48.614064755), (107.593029919, 45.714064755), (112.593031716, 45.714064755), align=None)
    extrude(amount=-CUT_EXTRUDE5_DEPTH, mode=Mode.SUBTRACT)

    # Sketch17 → Cut-Extrude6 (cut)
    with BuildSketch(Plane.XY.offset(5)):
        with Locations((-110.724794253, 43.614064755)):
            Rectangle(SKETCH17_W, SKETCH17_H)
        with Locations((110.910254355, 43.614064755)):
            Rectangle(SKETCH17_W_2, SKETCH17_H)
    extrude(amount=-CUT_EXTRUDE6_DEPTH, mode=Mode.SUBTRACT)

    # Sketch19 → Boss-Extrude9 (add)
    with BuildSketch(Plane.XY.offset(5)):
        Polygon((97.590571243, 38.614064755), (107.590571243, 38.614064755), (107.593029919, 41.514064755), (112.596592557, 41.514064755), (112.593031716, 45.714064755), (107.593029919, 45.714064755), (107.590571243, 48.614064755), (97.590571243, 48.614064755), align=None)
        Polygon((-112.596592557, 41.514064755), (-107.593029919, 41.514064755), (-107.590571243, 38.614064755), (-97.590571243, 38.614064755), (-97.590571243, 48.614064755), (-107.590571243, 48.614064755), (-107.593029919, 45.714064755), (-112.593031716, 45.714064755), align=None)
    extrude(amount=-BOSS_EXTRUDE9_DEPTH)

    # Sketch20 → Cut-Extrude7 (cut)
    with BuildSketch(Plane.XY.offset(5)):
        Polygon((-112.594812137, 43.614064755), (-112.593031716, 45.714064755), (-109.593030638, 45.714064755), (-109.591843691, 47.114064755), (-106.791843691, 47.114064755), (-106.791843691, 45.714064755), (-95.593025606, 45.714064755), (-95.594806027, 43.614064755), (-95.593025606, 41.514064755), (-106.791843691, 41.514064755), (-106.791843691, 40.114064755), (-109.591843691, 40.114064755), (-109.593030638, 41.514064755), (-112.593031716, 41.514064755), align=None)
        Polygon((112.594812137, 43.614064755), (112.593031716, 41.514064755), (109.593030638, 41.514064755), (109.591843691, 40.114064755), (106.791843691, 40.114064755), (106.791843691, 41.514064755), (95.593025606, 41.514064755), (95.594806027, 43.614064755), (95.593025606, 45.714064755), (106.791843691, 45.714064755), (106.791843691, 47.114064755), (109.591843691, 47.114064755), (109.593030638, 45.714064755), (112.593031716, 45.714064755), align=None)
    extrude(amount=-CUT_EXTRUDE7_DEPTH, mode=Mode.SUBTRACT)

    # Sketch21 → Cut-Extrude8 (cut)
    with BuildSketch(Plane.XY.offset(5)):
        with Locations((-112.274699266, 43.614722308)):
            Rectangle(SKETCH21_W, SKETCH21_H)
        with Locations((112.392365081, 43.614843257)):
            Rectangle(SKETCH21_W_2, SKETCH21_H_2)
    extrude(amount=-CUT_EXTRUDE8_DEPTH, mode=Mode.SUBTRACT)

    # Sketch22 → Boss-Extrude10 (add)
    with BuildSketch(Plane.XY.offset(5)):
        with BuildLine():
            Line((93.98569149, 89.947234922), (85.325437452, 89.947234922))
            ThreePointArc((85.325437452, 89.947234922), (89.655564471, 92.447234922), (93.98569149, 89.947234922))
        make_face()
        with BuildLine():
            Line((-93.98569149, 89.947234922), (-85.325437452, 89.947234922))
            ThreePointArc((-85.325437452, 89.947234922), (-89.655564471, 92.447234922), (-93.98569149, 89.947234922))
        make_face()
    extrude(amount=-BOSS_EXTRUDE10_DEPTH)

    # Sketch23 → Cut-Extrude9 (cut)
    with BuildSketch(Plane.XY.offset(5)):
        with Locations((89.655564471, 87.447234922)):
            Circle(SKETCH23_R)
        with Locations((-89.655564471, 87.447234922)):
            Circle(SKETCH23_R)
    extrude(amount=-CUT_EXTRUDE9_DEPTH, mode=Mode.SUBTRACT)


solid = part.part
